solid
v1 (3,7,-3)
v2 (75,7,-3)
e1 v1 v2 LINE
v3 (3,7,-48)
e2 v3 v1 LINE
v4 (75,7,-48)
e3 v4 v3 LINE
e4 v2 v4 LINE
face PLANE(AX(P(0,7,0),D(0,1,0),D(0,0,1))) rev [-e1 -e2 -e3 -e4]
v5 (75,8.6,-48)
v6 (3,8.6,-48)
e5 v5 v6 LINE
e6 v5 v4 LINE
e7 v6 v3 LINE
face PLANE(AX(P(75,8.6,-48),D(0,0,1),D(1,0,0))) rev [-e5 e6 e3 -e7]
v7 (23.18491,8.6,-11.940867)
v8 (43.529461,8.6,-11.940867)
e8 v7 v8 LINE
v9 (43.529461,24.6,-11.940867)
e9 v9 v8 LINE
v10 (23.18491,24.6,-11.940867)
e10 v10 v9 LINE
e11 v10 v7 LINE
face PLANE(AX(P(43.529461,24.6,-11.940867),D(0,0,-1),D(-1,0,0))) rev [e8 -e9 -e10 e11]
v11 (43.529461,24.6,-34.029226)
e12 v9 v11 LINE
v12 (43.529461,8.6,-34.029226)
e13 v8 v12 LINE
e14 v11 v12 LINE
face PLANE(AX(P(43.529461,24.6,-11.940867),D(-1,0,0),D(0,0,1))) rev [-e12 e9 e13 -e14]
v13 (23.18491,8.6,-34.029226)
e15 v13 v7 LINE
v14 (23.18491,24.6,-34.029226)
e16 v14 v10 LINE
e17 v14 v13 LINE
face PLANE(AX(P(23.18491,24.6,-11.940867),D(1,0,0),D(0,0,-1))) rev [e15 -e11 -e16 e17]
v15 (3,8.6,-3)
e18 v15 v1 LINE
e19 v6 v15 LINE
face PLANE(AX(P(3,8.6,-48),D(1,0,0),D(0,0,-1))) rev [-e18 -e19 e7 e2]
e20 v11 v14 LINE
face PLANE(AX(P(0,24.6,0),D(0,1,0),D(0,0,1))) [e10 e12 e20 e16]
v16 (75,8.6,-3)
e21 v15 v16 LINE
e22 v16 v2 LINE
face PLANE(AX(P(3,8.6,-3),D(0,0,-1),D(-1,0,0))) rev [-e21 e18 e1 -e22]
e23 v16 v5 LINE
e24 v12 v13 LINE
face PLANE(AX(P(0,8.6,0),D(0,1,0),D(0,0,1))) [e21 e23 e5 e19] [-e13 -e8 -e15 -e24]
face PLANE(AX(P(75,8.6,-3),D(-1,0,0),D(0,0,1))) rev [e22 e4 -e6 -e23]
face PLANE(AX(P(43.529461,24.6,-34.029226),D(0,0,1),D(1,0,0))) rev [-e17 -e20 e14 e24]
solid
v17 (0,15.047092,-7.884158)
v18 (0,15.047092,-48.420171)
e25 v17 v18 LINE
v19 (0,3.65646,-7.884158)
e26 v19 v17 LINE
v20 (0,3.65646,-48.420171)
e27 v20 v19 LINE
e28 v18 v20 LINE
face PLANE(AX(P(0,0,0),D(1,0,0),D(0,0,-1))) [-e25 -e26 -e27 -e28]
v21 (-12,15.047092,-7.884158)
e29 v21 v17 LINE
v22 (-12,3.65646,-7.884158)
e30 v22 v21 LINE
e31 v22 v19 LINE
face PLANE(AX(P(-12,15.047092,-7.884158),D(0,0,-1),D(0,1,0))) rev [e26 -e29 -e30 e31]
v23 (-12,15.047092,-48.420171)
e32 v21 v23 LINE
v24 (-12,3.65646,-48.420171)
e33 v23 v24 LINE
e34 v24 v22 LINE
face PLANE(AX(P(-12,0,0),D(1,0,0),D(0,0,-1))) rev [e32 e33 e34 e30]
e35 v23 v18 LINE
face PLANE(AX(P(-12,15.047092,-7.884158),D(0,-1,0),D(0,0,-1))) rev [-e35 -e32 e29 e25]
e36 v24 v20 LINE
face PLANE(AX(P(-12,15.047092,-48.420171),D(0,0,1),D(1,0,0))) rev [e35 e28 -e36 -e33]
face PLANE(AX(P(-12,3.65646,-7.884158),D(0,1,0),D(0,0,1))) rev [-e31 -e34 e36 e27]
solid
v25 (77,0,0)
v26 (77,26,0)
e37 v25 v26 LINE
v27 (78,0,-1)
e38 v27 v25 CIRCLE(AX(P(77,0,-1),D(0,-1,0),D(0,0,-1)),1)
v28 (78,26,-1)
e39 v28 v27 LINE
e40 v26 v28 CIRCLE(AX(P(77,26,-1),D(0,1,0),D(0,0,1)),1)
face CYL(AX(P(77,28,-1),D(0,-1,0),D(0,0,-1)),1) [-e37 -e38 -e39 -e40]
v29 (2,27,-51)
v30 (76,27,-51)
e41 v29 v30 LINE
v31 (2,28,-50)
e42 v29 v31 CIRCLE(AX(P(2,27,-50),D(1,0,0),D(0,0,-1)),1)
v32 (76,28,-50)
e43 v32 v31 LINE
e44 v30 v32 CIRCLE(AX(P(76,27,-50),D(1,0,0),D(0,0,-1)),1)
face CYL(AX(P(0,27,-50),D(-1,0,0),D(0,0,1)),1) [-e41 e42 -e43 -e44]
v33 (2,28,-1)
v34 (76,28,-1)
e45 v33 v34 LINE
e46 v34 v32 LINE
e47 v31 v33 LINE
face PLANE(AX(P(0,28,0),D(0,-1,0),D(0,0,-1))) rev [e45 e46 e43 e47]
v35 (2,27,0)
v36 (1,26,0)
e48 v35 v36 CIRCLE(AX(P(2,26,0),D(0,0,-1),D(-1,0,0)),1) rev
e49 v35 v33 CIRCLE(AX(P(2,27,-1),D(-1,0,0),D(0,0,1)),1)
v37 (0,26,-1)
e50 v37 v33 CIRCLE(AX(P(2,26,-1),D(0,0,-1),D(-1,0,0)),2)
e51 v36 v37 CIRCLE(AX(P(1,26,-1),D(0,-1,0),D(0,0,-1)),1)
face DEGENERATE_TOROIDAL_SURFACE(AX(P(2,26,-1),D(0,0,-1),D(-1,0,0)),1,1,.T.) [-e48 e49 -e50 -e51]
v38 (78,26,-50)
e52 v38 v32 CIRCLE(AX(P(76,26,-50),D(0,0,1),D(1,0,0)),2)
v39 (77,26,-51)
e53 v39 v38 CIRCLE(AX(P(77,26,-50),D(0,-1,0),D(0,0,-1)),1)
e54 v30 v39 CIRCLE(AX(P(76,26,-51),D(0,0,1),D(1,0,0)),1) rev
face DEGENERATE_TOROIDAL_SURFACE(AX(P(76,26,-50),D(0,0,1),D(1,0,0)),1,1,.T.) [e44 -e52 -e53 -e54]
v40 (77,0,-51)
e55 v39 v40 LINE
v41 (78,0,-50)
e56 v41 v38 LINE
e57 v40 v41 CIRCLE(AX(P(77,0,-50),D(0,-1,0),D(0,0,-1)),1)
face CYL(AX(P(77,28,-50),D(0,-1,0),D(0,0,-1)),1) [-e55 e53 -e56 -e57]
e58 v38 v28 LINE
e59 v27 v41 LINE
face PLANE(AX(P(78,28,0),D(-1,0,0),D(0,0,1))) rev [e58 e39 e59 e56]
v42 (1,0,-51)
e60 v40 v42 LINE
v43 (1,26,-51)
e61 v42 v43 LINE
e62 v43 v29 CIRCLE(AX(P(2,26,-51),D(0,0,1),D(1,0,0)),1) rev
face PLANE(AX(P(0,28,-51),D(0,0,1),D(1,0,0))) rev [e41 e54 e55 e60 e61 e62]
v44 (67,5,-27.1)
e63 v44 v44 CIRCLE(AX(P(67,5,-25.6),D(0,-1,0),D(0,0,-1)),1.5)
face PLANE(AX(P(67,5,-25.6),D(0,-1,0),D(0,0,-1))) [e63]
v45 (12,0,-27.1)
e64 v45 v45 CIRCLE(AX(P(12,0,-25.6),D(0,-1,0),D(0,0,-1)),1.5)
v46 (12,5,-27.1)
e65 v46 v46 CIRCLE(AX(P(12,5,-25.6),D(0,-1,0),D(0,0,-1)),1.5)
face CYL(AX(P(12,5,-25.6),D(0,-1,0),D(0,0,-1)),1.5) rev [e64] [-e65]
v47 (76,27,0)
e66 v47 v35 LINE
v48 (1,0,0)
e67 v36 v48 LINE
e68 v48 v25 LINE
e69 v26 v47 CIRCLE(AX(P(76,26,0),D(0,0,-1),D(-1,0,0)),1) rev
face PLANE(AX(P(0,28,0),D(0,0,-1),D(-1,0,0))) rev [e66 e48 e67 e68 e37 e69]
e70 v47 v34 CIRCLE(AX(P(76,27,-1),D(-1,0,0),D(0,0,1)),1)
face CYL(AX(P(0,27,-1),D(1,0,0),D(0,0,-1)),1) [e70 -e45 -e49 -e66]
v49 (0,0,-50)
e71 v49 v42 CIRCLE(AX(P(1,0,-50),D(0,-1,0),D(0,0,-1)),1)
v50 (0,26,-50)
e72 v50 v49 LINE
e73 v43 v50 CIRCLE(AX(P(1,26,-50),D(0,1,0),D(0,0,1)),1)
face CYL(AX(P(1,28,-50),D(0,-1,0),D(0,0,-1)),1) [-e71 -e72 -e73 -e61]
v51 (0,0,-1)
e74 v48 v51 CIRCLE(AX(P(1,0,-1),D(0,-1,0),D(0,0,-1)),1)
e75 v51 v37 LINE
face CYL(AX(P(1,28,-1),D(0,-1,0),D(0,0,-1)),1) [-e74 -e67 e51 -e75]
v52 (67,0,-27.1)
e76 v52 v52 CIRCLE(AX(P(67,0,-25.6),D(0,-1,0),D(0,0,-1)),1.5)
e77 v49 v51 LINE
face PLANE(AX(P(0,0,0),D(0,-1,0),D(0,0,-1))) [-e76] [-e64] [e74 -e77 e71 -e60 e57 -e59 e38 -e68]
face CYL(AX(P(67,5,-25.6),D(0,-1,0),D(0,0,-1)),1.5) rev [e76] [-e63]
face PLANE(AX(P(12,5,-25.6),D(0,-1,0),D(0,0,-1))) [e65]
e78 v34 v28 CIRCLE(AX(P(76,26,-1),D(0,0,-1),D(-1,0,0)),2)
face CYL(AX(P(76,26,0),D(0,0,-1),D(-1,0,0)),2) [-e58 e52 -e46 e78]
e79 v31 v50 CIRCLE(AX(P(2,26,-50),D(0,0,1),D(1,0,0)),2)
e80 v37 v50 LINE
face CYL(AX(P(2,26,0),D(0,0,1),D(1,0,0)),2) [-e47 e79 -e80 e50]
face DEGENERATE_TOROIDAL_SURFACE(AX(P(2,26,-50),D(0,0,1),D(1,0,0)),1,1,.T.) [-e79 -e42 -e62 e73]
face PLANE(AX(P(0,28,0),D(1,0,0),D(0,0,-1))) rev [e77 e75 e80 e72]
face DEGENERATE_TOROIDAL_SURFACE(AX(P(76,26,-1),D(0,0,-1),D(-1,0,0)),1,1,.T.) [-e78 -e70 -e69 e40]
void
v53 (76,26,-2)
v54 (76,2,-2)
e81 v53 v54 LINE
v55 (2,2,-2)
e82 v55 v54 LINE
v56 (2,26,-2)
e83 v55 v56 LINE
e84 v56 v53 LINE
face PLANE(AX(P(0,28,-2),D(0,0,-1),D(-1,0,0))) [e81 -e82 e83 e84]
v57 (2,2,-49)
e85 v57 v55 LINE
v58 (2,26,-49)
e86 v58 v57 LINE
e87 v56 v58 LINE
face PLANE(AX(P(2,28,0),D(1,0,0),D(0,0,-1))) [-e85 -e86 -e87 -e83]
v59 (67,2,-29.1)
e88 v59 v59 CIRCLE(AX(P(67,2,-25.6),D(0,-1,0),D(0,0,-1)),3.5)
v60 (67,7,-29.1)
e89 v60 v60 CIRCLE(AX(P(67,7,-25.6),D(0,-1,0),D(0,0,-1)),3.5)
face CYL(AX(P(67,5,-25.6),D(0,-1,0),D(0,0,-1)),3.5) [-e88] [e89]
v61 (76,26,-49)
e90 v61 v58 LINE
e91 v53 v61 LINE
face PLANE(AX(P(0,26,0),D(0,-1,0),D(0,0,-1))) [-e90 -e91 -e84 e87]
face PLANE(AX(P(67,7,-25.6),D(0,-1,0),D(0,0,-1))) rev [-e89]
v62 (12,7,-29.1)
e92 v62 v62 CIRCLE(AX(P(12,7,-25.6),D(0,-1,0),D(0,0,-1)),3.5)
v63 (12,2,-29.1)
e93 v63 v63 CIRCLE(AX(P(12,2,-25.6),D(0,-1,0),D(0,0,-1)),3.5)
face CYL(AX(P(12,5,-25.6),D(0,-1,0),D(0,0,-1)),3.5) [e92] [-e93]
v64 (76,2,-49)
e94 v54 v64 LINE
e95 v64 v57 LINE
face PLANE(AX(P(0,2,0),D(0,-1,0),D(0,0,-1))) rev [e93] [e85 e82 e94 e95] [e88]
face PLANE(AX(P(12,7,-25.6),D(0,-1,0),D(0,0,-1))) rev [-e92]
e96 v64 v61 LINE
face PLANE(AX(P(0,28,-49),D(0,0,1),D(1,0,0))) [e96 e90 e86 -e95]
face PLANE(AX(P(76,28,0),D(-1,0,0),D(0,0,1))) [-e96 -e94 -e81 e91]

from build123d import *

# Parameters (mm, degrees)
SKETCH1_W           = 78
SKETCH1_H           = 51
BOSS_EXTRUDE1_DEPTH = 28
SKETCH2_R           = 1.5
CUT_EXTRUDE1_DEPTH  = 5
SKETCH3_W           = 40.53601249
SKETCH3_H           = 11.390631449
BOSS_EXTRUDE2_DEPTH = 12
FILLET1_R           = 2
FILLET2_R           = 1
SHELL3_START        = 2
SHELL3_OUTLINE_W    = 74
SHELL3_OUTLINE_H    = 47
SHELL3_OUTLINE_R    = 3.5
SHELL3_DEPTH        = 24
SHELL3_START_2      = 7
SHELL3_2_OUTLINE_R  = 3.5
SHELL3_2_DEPTH      = 19
SKETCH5_W           = 72
SKETCH5_H           = 45
BOSS_EXTRUDE3_DEPTH = 1.6
SKETCH6_W           = 20.344550397
SKETCH6_H           = 22.088359597
BOSS_EXTRUDE4_DEPTH = 16


# Read off the part's stored shape, not the designer's step: Shell3
with BuildPart() as part:
    # Sketch1 → Boss-Extrude1 (new body)
    with BuildSketch(Plane(origin=(0, 0, 0), x_dir=(1, 0, 0), z_dir=(0, 1, 0))):
        with Locations((39, 25.5)):
            Rectangle(SKETCH1_W, SKETCH1_H)
    extrude(amount=BOSS_EXTRUDE1_DEPTH)

    # Sketch2 → Cut-Extrude1 (cut)
    with BuildSketch(Plane.XZ):
        with Locations(Location((67, -25.6, 0), (0, 0, 270))):
            Circle(SKETCH2_R)
        with Locations(Location((12, -25.6, 0), (0, 0, 270))):
            Circle(SKETCH2_R)
    extrude(amount=-CUT_EXTRUDE1_DEPTH, mode=Mode.SUBTRACT)

    # Fillet1
    fillet1_edges = [part.edges().sort_by_distance(p)[0] for p in [
        (78, 28, -25.5),
        (0, 28, -25.5),
    ]]
    fillet(fillet1_edges, radius=FILLET1_R)

    # Fillet2
    fillet2_edges = [part.edges().sort_by_distance(p)[0] for p in [
        (39, 28, 0),
        (39, 28, -51),
        (0, 13, -51),
        (78, 13, -51),
        (0.585786438, 27.414213562, -51),
        (77.414213562, 27.414213562, -51),
        (78, 13, 0),
        (0, 13, 0),
        (0.585786438, 27.414213562, 0),
        (77.414213562, 27.414213562, 0),
    ]]
    fillet(fillet2_edges, radius=FILLET2_R)

    # Shell3 outline → Shell3 (cut)
    with BuildSketch(Plane(origin=(0, 0, 0), x_dir=(1, 0, 0), z_dir=(0, 1, 0)).offset(SHELL3_START)):
        with Locations((39, 25.5)):
            Rectangle(SHELL3_OUTLINE_W, SHELL3_OUTLINE_H)
        with Locations((12, 25.6)):
            Circle(SHELL3_OUTLINE_R, mode=Mode.SUBTRACT)
        with Locations((67, 25.6)):
            Circle(SHELL3_OUTLINE_R, mode=Mode.SUBTRACT)
    extrude(amount=SHELL3_DEPTH, mode=Mode.SUBTRACT)

    # Shell3 2 outline → Shell3 2 (cut)
    with BuildSketch(Plane(origin=(0, 0, 0), x_dir=(1, 0, 0), z_dir=(0, 1, 0)).offset(SHELL3_START_2)):
        with Locations((12, 25.6)):
            Circle(SHELL3_2_OUTLINE_R)
        with Locations((67, 25.6)):
            Circle(SHELL3_2_OUTLINE_R)
    extrude(amount=SHELL3_2_DEPTH, mode=Mode.SUBTRACT)


with BuildPart() as body_2:
    # Sketch3 → Boss-Extrude2 (new body)
    with BuildSketch(Plane.ZY):
        with Locations((-28.152164423, 9.351775934)):
            Rectangle(SKETCH3_W, SKETCH3_H)
    extrude(amount=BOSS_EXTRUDE2_DEPTH)


with BuildPart() as body_3:
    # Sketch5 → Boss-Extrude3 (new body)
    with BuildSketch(Plane(origin=(0, 7, 0), x_dir=(1, 0, 0), z_dir=(0, 1, 0))):
        with Locations((39, 25.5)):
            Rectangle(SKETCH5_W, SKETCH5_H)
    extrude(amount=BOSS_EXTRUDE3_DEPTH)

    # Sketch6 → Boss-Extrude4 (add)
    with BuildSketch(Plane(origin=(0, 8.6, 0), x_dir=(1, 0, 0), z_dir=(0, 1, 0))):
        with Locations((33.357185466, 22.98504657)):
            Rectangle(SKETCH6_W, SKETCH6_H)
    extrude(amount=BOSS_EXTRUDE4_DEPTH)


solid = Compound([part.part, body_2.part, body_3.part])
